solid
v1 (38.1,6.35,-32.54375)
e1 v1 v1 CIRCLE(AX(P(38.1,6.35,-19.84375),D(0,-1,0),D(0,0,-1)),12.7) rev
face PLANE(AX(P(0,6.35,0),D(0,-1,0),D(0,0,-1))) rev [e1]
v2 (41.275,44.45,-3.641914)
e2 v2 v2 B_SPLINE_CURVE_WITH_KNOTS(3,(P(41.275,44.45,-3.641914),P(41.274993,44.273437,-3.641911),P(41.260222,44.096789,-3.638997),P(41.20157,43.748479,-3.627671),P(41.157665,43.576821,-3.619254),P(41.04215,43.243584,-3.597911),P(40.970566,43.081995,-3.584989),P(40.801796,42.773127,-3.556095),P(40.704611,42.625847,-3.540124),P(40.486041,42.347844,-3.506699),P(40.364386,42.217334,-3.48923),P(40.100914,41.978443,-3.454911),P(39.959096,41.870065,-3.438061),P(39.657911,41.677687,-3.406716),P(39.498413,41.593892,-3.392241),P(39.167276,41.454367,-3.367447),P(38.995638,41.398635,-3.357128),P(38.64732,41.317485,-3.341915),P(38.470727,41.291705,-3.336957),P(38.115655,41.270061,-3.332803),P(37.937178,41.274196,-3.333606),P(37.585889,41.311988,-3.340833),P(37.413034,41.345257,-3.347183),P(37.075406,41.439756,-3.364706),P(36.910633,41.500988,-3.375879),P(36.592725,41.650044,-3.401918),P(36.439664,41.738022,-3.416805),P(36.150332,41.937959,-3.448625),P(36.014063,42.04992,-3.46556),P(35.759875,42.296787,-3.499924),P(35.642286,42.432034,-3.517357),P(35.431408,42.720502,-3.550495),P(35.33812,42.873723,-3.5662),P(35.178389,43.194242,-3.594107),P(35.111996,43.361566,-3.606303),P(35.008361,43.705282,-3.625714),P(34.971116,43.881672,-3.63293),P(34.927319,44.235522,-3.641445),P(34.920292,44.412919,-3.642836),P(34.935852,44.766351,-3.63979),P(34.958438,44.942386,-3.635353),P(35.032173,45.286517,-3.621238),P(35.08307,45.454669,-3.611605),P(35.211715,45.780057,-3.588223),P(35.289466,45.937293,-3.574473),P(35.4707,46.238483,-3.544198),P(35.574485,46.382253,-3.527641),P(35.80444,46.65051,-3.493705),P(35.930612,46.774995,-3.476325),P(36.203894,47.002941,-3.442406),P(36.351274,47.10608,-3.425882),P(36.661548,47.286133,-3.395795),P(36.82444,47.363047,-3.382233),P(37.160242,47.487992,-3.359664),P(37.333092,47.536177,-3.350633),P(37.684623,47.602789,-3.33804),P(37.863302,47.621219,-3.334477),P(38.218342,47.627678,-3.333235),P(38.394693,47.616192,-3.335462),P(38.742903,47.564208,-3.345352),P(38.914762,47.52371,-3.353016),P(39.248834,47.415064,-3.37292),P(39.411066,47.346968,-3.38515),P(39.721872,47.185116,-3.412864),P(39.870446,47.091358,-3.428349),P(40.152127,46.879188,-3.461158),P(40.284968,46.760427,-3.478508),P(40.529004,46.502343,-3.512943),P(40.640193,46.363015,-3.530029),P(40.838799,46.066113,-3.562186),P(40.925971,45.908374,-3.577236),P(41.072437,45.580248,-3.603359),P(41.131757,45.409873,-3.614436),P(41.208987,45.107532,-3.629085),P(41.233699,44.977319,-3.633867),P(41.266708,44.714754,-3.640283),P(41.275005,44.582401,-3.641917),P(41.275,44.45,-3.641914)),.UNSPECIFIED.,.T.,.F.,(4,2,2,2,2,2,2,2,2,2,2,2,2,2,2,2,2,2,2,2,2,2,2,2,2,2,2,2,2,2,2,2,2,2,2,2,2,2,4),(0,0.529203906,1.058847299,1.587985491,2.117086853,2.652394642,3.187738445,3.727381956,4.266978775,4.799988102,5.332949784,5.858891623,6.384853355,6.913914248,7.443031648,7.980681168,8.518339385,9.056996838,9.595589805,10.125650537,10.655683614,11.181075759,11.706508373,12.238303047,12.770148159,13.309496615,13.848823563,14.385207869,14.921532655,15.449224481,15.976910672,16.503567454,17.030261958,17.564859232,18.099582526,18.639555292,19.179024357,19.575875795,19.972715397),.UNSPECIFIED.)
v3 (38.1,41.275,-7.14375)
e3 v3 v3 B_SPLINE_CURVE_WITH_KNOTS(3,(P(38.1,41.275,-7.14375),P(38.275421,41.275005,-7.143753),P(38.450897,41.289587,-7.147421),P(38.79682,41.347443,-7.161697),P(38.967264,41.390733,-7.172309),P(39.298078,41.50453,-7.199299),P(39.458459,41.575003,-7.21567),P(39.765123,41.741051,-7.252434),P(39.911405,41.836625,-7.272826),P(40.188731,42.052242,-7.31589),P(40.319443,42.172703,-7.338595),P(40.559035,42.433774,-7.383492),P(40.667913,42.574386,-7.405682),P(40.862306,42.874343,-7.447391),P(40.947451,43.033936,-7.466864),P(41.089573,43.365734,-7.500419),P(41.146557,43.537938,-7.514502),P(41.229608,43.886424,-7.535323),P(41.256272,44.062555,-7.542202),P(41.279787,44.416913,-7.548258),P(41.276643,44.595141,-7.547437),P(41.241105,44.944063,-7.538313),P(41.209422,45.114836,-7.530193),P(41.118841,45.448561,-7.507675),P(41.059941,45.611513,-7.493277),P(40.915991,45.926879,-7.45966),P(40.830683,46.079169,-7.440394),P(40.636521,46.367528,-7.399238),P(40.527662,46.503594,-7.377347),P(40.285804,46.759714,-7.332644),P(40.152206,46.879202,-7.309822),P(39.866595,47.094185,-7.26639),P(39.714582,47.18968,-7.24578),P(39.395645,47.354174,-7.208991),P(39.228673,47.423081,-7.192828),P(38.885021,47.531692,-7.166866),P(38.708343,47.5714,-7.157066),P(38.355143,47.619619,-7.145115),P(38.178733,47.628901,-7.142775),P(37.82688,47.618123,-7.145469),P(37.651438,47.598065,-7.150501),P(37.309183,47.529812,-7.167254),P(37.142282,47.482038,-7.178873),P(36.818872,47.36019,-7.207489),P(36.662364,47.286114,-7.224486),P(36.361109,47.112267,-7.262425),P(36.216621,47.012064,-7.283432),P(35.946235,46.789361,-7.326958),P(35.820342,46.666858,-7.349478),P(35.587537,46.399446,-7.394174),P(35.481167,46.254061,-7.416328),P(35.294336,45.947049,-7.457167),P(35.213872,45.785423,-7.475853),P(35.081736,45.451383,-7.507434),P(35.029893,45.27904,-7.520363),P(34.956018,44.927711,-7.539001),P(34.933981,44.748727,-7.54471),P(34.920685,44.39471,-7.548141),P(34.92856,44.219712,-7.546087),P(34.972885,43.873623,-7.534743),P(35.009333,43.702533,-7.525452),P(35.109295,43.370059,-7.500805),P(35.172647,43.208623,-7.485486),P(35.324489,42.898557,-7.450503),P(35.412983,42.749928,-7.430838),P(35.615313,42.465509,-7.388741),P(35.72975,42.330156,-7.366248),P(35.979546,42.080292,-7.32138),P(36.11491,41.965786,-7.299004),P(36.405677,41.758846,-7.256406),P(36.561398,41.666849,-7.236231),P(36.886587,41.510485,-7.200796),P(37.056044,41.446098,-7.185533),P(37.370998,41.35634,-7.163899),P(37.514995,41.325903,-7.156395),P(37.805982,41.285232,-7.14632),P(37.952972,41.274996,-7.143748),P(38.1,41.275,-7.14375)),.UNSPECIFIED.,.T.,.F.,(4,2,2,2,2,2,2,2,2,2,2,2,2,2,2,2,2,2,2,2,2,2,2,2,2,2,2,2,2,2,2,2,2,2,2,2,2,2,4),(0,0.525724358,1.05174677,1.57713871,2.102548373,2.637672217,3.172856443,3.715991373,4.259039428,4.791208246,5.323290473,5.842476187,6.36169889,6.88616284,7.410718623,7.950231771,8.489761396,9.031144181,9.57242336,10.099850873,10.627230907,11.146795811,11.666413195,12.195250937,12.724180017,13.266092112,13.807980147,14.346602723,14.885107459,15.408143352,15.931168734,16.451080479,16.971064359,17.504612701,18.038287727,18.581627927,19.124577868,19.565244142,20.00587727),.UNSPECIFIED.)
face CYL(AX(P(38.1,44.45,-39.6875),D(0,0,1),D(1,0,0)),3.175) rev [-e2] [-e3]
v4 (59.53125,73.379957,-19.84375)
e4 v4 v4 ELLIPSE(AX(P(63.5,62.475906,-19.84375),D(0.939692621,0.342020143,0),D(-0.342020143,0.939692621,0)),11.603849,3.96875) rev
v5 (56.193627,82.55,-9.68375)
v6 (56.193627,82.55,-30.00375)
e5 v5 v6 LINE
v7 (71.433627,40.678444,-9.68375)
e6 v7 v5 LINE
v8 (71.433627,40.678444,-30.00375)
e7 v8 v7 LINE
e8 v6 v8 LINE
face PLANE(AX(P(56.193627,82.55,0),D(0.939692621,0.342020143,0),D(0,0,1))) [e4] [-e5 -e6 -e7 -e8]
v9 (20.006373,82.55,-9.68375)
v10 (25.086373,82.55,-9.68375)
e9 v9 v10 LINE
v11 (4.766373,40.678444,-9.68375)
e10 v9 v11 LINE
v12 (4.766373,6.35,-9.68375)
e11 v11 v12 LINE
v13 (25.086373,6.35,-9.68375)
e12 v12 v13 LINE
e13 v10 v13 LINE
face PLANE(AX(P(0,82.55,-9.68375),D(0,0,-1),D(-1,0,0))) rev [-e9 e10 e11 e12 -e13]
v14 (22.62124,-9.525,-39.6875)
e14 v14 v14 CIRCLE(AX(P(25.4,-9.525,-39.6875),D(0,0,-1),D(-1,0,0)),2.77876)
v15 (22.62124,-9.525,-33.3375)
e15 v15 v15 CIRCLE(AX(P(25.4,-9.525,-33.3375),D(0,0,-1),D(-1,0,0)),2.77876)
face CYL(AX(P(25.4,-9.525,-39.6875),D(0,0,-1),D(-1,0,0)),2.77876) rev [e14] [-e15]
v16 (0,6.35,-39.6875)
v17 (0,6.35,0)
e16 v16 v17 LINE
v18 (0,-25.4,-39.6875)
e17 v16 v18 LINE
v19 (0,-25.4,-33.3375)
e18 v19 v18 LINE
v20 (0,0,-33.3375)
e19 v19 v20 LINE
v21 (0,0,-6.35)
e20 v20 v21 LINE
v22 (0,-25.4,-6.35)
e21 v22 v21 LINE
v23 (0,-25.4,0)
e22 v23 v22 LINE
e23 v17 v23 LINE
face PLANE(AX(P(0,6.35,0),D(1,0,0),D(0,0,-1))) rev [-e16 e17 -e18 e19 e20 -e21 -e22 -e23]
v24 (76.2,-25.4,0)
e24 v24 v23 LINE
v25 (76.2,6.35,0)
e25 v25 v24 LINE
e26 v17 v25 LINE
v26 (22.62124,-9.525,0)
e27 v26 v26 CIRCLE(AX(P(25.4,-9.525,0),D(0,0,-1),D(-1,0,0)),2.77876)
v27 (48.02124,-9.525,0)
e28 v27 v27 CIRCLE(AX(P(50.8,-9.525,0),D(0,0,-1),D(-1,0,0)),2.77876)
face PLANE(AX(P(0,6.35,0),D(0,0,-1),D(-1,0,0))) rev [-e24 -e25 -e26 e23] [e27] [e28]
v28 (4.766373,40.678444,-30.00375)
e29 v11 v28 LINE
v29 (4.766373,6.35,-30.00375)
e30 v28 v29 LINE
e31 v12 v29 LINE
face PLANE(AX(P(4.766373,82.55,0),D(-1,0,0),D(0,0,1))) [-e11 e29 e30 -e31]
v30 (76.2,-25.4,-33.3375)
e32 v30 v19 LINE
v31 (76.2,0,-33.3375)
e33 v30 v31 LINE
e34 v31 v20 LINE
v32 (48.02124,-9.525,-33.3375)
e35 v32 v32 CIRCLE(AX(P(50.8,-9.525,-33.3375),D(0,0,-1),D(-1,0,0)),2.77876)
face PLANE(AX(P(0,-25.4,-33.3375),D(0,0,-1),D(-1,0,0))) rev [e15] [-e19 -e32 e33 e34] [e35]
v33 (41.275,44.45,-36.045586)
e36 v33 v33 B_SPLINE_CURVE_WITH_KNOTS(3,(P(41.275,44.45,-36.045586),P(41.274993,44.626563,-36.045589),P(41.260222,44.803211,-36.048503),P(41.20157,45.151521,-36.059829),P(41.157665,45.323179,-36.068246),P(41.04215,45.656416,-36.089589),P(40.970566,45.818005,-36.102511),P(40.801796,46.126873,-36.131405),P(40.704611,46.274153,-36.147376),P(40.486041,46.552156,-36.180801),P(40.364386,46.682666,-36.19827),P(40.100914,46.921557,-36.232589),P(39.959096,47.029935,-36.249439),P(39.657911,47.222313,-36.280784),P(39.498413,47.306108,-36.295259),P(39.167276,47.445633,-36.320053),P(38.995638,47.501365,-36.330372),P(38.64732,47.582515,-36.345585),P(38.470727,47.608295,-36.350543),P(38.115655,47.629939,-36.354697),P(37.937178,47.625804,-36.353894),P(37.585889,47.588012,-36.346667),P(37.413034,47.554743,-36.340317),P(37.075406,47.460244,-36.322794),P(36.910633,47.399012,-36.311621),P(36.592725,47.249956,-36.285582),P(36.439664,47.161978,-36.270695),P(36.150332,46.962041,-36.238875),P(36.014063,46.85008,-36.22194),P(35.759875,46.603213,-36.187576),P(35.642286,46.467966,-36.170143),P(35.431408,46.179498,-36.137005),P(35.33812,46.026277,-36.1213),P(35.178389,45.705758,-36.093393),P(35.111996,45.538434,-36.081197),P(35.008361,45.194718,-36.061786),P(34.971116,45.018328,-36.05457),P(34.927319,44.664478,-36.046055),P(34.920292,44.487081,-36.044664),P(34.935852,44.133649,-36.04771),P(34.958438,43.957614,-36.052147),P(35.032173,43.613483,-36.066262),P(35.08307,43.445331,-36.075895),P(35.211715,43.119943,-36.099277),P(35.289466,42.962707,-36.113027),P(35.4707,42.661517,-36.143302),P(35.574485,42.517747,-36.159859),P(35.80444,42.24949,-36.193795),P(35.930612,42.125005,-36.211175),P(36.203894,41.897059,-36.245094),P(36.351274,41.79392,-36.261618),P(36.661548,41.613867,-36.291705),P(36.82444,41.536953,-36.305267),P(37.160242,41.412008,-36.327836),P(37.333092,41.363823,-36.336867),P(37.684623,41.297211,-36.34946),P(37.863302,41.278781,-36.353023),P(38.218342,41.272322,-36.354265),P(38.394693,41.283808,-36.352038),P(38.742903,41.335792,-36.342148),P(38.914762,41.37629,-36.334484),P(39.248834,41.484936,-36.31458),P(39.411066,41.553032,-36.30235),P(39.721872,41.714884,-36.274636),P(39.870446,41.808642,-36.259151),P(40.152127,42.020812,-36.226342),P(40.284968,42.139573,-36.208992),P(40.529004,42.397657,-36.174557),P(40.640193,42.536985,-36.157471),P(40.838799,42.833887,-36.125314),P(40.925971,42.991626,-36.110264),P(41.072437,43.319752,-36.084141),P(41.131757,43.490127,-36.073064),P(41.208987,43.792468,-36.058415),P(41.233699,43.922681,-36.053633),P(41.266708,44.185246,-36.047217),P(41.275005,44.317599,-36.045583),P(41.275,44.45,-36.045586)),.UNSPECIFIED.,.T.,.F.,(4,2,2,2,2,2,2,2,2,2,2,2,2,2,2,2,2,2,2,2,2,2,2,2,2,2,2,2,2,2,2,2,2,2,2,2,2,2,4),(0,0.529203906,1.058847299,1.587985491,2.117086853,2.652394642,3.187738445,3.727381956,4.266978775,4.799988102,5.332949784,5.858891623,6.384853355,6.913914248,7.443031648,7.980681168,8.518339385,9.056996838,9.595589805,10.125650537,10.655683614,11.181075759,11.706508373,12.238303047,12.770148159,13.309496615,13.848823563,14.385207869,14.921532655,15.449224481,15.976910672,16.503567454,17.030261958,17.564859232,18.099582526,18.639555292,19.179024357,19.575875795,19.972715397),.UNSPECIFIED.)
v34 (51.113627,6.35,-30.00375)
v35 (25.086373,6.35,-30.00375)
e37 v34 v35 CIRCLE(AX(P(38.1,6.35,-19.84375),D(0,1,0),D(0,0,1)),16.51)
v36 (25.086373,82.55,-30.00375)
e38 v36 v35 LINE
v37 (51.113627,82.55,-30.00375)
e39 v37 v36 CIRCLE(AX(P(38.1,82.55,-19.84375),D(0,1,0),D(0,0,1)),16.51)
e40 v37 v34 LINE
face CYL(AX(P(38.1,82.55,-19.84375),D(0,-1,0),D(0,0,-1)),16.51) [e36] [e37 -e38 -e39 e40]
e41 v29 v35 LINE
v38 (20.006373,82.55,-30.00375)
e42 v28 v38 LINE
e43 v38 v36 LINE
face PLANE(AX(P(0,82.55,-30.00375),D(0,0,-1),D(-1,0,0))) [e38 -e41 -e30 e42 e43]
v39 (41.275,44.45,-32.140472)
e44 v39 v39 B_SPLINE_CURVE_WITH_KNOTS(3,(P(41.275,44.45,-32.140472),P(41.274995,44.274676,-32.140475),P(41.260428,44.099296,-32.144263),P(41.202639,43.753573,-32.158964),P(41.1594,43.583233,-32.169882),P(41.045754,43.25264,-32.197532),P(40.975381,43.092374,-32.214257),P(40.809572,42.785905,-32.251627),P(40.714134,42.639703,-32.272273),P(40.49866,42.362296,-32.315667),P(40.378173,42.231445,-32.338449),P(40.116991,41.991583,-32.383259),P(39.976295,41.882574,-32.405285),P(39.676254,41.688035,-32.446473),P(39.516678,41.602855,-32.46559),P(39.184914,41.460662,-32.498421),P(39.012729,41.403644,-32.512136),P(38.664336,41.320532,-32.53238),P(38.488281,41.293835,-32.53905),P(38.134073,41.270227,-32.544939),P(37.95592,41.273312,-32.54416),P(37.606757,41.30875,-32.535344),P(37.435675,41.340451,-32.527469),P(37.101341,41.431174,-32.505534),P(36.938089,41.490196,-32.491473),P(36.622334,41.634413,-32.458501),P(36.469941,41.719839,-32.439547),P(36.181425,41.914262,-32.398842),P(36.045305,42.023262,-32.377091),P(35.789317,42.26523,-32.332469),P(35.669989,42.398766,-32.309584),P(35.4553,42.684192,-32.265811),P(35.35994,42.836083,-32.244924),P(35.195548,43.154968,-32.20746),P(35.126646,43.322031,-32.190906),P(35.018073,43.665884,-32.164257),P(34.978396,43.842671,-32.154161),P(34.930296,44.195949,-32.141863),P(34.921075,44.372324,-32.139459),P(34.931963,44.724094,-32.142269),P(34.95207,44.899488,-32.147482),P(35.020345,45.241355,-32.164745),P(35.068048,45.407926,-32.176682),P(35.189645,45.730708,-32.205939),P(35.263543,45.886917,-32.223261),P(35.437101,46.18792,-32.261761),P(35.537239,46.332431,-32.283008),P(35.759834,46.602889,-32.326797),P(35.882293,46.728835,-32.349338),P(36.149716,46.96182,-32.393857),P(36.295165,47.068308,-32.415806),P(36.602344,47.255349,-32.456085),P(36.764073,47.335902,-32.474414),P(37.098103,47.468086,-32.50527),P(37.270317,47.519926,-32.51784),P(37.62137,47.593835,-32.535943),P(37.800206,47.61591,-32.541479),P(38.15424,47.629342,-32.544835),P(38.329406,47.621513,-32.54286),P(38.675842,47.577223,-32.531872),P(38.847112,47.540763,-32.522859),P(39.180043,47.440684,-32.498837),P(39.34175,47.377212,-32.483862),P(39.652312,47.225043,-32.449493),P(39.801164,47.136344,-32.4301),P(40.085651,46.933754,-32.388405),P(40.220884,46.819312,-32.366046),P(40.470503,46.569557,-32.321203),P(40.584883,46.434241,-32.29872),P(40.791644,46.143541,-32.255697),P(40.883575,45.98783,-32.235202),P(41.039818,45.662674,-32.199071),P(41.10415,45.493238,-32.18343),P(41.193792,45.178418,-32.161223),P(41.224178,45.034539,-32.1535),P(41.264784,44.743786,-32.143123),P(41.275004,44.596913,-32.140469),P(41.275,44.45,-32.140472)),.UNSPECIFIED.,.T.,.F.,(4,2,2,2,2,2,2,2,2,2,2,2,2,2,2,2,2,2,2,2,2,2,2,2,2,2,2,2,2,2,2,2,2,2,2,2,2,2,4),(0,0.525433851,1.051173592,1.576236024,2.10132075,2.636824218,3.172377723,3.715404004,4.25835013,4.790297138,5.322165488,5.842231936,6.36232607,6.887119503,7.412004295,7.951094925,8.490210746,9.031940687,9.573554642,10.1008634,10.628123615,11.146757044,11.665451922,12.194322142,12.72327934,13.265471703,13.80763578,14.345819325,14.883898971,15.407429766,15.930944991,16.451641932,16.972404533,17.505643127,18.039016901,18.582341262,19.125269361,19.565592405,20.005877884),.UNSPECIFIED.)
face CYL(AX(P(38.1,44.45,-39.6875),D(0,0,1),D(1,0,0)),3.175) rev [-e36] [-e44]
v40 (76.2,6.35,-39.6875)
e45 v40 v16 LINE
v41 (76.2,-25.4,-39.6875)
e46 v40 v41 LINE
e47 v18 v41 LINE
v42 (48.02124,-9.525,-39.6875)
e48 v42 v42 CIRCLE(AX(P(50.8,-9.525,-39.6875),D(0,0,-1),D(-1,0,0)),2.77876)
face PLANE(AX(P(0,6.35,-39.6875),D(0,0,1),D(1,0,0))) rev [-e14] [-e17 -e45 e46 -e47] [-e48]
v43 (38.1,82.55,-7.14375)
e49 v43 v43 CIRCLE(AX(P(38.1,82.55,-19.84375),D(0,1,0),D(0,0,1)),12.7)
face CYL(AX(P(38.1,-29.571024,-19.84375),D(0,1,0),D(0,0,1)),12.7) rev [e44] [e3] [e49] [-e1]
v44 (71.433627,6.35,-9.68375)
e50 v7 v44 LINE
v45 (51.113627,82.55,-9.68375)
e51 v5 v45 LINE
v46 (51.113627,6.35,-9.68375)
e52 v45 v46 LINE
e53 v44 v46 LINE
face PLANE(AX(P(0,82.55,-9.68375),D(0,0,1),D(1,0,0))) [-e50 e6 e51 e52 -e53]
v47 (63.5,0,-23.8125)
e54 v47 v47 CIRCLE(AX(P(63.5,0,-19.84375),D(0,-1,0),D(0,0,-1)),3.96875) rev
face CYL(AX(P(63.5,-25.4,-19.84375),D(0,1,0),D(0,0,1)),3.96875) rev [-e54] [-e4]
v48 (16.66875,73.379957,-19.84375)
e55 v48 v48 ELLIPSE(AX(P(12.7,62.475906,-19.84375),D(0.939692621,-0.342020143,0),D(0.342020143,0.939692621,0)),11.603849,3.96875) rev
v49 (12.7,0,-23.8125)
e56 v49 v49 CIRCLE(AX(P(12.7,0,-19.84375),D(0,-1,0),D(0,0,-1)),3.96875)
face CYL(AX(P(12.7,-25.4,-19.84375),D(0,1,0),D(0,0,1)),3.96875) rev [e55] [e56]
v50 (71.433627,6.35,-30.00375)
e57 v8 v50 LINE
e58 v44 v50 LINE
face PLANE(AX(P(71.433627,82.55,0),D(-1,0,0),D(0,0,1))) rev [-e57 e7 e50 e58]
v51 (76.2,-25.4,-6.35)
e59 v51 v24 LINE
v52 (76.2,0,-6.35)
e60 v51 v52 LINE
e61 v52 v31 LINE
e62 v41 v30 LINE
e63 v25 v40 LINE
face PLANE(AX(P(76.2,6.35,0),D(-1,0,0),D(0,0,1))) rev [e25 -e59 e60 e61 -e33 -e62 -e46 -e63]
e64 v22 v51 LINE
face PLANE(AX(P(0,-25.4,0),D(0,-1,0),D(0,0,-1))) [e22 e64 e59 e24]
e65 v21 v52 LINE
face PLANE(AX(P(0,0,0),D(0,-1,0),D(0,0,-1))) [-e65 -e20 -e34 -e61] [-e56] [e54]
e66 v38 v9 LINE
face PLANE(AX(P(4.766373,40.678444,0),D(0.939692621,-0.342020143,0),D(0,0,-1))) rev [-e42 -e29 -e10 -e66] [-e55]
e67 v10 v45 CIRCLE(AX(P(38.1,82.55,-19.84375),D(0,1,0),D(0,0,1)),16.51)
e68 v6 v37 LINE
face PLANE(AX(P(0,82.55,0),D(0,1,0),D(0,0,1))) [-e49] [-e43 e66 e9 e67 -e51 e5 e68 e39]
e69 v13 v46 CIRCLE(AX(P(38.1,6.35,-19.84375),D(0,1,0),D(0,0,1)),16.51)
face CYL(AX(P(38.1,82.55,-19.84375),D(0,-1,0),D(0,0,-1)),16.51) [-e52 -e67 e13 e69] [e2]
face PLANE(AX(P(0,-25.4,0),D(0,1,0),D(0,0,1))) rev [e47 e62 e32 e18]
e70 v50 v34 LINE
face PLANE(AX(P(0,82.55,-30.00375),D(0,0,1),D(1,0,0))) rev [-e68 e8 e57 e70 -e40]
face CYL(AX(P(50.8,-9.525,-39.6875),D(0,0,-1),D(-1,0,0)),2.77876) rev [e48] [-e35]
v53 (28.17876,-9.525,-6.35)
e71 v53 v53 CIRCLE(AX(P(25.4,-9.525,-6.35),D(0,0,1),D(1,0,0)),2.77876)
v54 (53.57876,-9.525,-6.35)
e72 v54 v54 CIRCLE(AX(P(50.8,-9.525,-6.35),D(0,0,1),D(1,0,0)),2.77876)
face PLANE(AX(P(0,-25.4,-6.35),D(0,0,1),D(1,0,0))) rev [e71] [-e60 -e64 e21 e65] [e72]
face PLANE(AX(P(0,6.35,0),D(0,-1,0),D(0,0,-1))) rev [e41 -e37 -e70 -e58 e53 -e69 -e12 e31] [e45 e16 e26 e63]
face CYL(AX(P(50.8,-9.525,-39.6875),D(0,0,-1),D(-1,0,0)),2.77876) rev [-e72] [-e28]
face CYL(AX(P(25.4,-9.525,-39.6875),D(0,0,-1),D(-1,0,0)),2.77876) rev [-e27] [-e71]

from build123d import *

# Parameters (mm, degrees)
SKETCH1_W                                 = 76.2
SKETCH1_H                                 = 39.6875
BASE_DEPTH                                = 6.35
SKETCH2_W                                 = 76.2
SKETCH2_H                                 = 6.35
WALLS_DEPTH                               = 25.4
SCREW_START                               = -39.6875
SCREW_HOLE_OUTLINE_R                      = 2.77876
SCREW_HOLE_DEPTH                          = 39.6875
HOLE_PATTERN_COUNT                        = 2
HOLE_PATTERN_PITCH                        = 25.4
TOP_SECTION_DEPTH                         = 76.2
BOLT_HOLE_CHAMFER_SIZE                    = 15.24
BOLT_HOLE_CHAMFER_SIZE2                   = 41.871555872
SKETCH24_R                                = 12.7
TEMP_POLE_HOLE_DEPTH                      = 76.2
SKETCH26_R                                = 3.96875
TEMP_BOLT_HOLES_DEPTH                     = 138.966445762
TOP_SECTION_BROOM_SUPPORT_HOLE_DEPTH      = 115.222803793
TOP_SECTION_BROOM_SUPPORT_HOLE_DEPTH_BACK = 115.222803793
SKETCH28_R                                = 3.175


# Read off the part's stored shape, not the designer's step: Screw hole
with BuildPart() as part:
    # Sketch1 → Base (new body)
    with BuildSketch(Plane(origin=(0, 0, 0), x_dir=(1, 0, 0), z_dir=(0, 1, 0))):
        with Locations((38.1, 19.84375)):
            Rectangle(SKETCH1_W, SKETCH1_H)
    extrude(amount=BASE_DEPTH)

    # Sketch2 → Walls (add)
    with BuildSketch(Plane.XZ):
        with Locations((38.1, -3.175)):
            Rectangle(SKETCH2_W, SKETCH2_H)
        with Locations((38.1, -36.5125)):
            Rectangle(SKETCH2_W, SKETCH2_H)
    extrude(amount=WALLS_DEPTH)

    # Screw hole outline → Screw hole (cut)
    with BuildSketch(Plane.XY.offset(SCREW_START)):
        with Locations((50.8, -9.525)):
            Circle(SCREW_HOLE_OUTLINE_R)
    screw_hole = extrude(amount=SCREW_HOLE_DEPTH, mode=Mode.SUBTRACT)

    # Hole pattern: Screw hole ×2
    with Locations(*[(-i * HOLE_PATTERN_PITCH, 0, 0) for i in range(1, HOLE_PATTERN_COUNT)]):
        add(screw_hole, mode=Mode.SUBTRACT)

    # Sketch7 → Top section (add)
    with BuildSketch(Plane(origin=(0, 6.35, 0), x_dir=(1, 0, 0), z_dir=(0, 1, 0))):
        with BuildLine():
            Line((4.766372527, 30.00375), (4.766372527, 9.68375))
            Line((4.766372527, 9.68375), (25.086372527, 9.68375))
            ThreePointArc((25.086372527, 9.68375), (21.59, 19.84375), (25.086372527, 30.00375))
            Line((25.086372527, 30.00375), (4.766372527, 30.00375))
        make_face()
        with BuildLine():
            ThreePointArc((25.086372527, 30.00375), (21.59, 19.84375), (25.086372527, 9.68375))
            Line((25.086372527, 9.68375), (25.086372527, 30.00375))
        make_face()
        with BuildLine():
            Line((25.086372527, 30.00375), (25.086372527, 9.68375))
            ThreePointArc((25.086372527, 9.68375), (38.1, 3.33375), (51.113627473, 9.68375))
            Line((51.113627473, 9.68375), (51.113627473, 30.00375))
            ThreePointArc((51.113627473, 30.00375), (38.1, 36.35375), (25.086372527, 30.00375))
        make_face()
        with BuildLine():
            Line((51.113627473, 30.00375), (51.113627473, 9.68375))
            ThreePointArc((51.113627473, 9.68375), (53.711455563, 14.471361778), (54.61, 19.84375))
            ThreePointArc((54.61, 19.84375), (53.711455563, 25.216138222), (51.113627473, 30.00375))
        make_face()
        with BuildLine():
            ThreePointArc((54.61, 19.84375), (53.711455563, 14.471361778), (51.113627473, 9.68375))
            Line((51.113627473, 9.68375), (71.433627473, 9.68375))
            Line((71.433627473, 9.68375), (71.433627473, 30.00375))
            Line((71.433627473, 30.00375), (51.113627473, 30.00375))
            ThreePointArc((51.113627473, 30.00375), (53.711455563, 25.216138222), (54.61, 19.84375))
        make_face()
    extrude(amount=TOP_SECTION_DEPTH)

    # Bolt hole chamfer
    bolt_hole_chamfer_edges = [part.edges().sort_by_distance(p)[0] for p in [
        (4.766372527, 82.55, -19.84375),
        (71.433627473, 82.55, -19.84375),
    ]]
    bolt_hole_chamfer_side = [part.faces().sort_by_distance(p)[0] for p in [
        (38.1, 82.55, -19.84375),
    ]]
    chamfer(bolt_hole_chamfer_edges, length=BOLT_HOLE_CHAMFER_SIZE, length2=BOLT_HOLE_CHAMFER_SIZE2, reference=bolt_hole_chamfer_side[0])

    # Sketch24 → Temp Pole Hole (cut)
    with BuildSketch(Plane(origin=(0, 82.55, 0), x_dir=(1, 0, 0), z_dir=(0, 1, 0))):
        with Locations(Location((38.1, 19.84375, 0), (0, 0, 270))):
            Circle(SKETCH24_R)
    extrude(amount=-TEMP_POLE_HOLE_DEPTH, mode=Mode.SUBTRACT)

    # Sketch26 → Temp bolt holes (cut, through all)
    with BuildSketch(Plane(origin=(0, 82.55, 0), x_dir=(1, 0, 0), z_dir=(0, 1, 0))):
        with Locations((12.7, 19.84375)):
            Circle(SKETCH26_R)
    temp_bolt_holes = extrude(amount=-TEMP_BOLT_HOLES_DEPTH, mode=Mode.SUBTRACT)

    # Temp bolt hole mirror: Temp bolt holes across plane
    add(temp_bolt_holes.mirror(Plane(origin=(38.1, 0, 0), x_dir=(0, 0, 1), z_dir=(1, 0, 0))), mode=Mode.SUBTRACT)

    # Sketch28 → Top section broom support hole (cut, two sides: drawn at the far end of the back side and taken through both)
    with BuildSketch(Plane.XY.offset(-19.05).offset(-TOP_SECTION_BROOM_SUPPORT_HOLE_DEPTH_BACK)):
        with Locations((38.1, 44.45)):
            Circle(SKETCH28_R)
    extrude(amount=TOP_SECTION_BROOM_SUPPORT_HOLE_DEPTH + TOP_SECTION_BROOM_SUPPORT_HOLE_DEPTH_BACK, mode=Mode.SUBTRACT)


solid = part.part
